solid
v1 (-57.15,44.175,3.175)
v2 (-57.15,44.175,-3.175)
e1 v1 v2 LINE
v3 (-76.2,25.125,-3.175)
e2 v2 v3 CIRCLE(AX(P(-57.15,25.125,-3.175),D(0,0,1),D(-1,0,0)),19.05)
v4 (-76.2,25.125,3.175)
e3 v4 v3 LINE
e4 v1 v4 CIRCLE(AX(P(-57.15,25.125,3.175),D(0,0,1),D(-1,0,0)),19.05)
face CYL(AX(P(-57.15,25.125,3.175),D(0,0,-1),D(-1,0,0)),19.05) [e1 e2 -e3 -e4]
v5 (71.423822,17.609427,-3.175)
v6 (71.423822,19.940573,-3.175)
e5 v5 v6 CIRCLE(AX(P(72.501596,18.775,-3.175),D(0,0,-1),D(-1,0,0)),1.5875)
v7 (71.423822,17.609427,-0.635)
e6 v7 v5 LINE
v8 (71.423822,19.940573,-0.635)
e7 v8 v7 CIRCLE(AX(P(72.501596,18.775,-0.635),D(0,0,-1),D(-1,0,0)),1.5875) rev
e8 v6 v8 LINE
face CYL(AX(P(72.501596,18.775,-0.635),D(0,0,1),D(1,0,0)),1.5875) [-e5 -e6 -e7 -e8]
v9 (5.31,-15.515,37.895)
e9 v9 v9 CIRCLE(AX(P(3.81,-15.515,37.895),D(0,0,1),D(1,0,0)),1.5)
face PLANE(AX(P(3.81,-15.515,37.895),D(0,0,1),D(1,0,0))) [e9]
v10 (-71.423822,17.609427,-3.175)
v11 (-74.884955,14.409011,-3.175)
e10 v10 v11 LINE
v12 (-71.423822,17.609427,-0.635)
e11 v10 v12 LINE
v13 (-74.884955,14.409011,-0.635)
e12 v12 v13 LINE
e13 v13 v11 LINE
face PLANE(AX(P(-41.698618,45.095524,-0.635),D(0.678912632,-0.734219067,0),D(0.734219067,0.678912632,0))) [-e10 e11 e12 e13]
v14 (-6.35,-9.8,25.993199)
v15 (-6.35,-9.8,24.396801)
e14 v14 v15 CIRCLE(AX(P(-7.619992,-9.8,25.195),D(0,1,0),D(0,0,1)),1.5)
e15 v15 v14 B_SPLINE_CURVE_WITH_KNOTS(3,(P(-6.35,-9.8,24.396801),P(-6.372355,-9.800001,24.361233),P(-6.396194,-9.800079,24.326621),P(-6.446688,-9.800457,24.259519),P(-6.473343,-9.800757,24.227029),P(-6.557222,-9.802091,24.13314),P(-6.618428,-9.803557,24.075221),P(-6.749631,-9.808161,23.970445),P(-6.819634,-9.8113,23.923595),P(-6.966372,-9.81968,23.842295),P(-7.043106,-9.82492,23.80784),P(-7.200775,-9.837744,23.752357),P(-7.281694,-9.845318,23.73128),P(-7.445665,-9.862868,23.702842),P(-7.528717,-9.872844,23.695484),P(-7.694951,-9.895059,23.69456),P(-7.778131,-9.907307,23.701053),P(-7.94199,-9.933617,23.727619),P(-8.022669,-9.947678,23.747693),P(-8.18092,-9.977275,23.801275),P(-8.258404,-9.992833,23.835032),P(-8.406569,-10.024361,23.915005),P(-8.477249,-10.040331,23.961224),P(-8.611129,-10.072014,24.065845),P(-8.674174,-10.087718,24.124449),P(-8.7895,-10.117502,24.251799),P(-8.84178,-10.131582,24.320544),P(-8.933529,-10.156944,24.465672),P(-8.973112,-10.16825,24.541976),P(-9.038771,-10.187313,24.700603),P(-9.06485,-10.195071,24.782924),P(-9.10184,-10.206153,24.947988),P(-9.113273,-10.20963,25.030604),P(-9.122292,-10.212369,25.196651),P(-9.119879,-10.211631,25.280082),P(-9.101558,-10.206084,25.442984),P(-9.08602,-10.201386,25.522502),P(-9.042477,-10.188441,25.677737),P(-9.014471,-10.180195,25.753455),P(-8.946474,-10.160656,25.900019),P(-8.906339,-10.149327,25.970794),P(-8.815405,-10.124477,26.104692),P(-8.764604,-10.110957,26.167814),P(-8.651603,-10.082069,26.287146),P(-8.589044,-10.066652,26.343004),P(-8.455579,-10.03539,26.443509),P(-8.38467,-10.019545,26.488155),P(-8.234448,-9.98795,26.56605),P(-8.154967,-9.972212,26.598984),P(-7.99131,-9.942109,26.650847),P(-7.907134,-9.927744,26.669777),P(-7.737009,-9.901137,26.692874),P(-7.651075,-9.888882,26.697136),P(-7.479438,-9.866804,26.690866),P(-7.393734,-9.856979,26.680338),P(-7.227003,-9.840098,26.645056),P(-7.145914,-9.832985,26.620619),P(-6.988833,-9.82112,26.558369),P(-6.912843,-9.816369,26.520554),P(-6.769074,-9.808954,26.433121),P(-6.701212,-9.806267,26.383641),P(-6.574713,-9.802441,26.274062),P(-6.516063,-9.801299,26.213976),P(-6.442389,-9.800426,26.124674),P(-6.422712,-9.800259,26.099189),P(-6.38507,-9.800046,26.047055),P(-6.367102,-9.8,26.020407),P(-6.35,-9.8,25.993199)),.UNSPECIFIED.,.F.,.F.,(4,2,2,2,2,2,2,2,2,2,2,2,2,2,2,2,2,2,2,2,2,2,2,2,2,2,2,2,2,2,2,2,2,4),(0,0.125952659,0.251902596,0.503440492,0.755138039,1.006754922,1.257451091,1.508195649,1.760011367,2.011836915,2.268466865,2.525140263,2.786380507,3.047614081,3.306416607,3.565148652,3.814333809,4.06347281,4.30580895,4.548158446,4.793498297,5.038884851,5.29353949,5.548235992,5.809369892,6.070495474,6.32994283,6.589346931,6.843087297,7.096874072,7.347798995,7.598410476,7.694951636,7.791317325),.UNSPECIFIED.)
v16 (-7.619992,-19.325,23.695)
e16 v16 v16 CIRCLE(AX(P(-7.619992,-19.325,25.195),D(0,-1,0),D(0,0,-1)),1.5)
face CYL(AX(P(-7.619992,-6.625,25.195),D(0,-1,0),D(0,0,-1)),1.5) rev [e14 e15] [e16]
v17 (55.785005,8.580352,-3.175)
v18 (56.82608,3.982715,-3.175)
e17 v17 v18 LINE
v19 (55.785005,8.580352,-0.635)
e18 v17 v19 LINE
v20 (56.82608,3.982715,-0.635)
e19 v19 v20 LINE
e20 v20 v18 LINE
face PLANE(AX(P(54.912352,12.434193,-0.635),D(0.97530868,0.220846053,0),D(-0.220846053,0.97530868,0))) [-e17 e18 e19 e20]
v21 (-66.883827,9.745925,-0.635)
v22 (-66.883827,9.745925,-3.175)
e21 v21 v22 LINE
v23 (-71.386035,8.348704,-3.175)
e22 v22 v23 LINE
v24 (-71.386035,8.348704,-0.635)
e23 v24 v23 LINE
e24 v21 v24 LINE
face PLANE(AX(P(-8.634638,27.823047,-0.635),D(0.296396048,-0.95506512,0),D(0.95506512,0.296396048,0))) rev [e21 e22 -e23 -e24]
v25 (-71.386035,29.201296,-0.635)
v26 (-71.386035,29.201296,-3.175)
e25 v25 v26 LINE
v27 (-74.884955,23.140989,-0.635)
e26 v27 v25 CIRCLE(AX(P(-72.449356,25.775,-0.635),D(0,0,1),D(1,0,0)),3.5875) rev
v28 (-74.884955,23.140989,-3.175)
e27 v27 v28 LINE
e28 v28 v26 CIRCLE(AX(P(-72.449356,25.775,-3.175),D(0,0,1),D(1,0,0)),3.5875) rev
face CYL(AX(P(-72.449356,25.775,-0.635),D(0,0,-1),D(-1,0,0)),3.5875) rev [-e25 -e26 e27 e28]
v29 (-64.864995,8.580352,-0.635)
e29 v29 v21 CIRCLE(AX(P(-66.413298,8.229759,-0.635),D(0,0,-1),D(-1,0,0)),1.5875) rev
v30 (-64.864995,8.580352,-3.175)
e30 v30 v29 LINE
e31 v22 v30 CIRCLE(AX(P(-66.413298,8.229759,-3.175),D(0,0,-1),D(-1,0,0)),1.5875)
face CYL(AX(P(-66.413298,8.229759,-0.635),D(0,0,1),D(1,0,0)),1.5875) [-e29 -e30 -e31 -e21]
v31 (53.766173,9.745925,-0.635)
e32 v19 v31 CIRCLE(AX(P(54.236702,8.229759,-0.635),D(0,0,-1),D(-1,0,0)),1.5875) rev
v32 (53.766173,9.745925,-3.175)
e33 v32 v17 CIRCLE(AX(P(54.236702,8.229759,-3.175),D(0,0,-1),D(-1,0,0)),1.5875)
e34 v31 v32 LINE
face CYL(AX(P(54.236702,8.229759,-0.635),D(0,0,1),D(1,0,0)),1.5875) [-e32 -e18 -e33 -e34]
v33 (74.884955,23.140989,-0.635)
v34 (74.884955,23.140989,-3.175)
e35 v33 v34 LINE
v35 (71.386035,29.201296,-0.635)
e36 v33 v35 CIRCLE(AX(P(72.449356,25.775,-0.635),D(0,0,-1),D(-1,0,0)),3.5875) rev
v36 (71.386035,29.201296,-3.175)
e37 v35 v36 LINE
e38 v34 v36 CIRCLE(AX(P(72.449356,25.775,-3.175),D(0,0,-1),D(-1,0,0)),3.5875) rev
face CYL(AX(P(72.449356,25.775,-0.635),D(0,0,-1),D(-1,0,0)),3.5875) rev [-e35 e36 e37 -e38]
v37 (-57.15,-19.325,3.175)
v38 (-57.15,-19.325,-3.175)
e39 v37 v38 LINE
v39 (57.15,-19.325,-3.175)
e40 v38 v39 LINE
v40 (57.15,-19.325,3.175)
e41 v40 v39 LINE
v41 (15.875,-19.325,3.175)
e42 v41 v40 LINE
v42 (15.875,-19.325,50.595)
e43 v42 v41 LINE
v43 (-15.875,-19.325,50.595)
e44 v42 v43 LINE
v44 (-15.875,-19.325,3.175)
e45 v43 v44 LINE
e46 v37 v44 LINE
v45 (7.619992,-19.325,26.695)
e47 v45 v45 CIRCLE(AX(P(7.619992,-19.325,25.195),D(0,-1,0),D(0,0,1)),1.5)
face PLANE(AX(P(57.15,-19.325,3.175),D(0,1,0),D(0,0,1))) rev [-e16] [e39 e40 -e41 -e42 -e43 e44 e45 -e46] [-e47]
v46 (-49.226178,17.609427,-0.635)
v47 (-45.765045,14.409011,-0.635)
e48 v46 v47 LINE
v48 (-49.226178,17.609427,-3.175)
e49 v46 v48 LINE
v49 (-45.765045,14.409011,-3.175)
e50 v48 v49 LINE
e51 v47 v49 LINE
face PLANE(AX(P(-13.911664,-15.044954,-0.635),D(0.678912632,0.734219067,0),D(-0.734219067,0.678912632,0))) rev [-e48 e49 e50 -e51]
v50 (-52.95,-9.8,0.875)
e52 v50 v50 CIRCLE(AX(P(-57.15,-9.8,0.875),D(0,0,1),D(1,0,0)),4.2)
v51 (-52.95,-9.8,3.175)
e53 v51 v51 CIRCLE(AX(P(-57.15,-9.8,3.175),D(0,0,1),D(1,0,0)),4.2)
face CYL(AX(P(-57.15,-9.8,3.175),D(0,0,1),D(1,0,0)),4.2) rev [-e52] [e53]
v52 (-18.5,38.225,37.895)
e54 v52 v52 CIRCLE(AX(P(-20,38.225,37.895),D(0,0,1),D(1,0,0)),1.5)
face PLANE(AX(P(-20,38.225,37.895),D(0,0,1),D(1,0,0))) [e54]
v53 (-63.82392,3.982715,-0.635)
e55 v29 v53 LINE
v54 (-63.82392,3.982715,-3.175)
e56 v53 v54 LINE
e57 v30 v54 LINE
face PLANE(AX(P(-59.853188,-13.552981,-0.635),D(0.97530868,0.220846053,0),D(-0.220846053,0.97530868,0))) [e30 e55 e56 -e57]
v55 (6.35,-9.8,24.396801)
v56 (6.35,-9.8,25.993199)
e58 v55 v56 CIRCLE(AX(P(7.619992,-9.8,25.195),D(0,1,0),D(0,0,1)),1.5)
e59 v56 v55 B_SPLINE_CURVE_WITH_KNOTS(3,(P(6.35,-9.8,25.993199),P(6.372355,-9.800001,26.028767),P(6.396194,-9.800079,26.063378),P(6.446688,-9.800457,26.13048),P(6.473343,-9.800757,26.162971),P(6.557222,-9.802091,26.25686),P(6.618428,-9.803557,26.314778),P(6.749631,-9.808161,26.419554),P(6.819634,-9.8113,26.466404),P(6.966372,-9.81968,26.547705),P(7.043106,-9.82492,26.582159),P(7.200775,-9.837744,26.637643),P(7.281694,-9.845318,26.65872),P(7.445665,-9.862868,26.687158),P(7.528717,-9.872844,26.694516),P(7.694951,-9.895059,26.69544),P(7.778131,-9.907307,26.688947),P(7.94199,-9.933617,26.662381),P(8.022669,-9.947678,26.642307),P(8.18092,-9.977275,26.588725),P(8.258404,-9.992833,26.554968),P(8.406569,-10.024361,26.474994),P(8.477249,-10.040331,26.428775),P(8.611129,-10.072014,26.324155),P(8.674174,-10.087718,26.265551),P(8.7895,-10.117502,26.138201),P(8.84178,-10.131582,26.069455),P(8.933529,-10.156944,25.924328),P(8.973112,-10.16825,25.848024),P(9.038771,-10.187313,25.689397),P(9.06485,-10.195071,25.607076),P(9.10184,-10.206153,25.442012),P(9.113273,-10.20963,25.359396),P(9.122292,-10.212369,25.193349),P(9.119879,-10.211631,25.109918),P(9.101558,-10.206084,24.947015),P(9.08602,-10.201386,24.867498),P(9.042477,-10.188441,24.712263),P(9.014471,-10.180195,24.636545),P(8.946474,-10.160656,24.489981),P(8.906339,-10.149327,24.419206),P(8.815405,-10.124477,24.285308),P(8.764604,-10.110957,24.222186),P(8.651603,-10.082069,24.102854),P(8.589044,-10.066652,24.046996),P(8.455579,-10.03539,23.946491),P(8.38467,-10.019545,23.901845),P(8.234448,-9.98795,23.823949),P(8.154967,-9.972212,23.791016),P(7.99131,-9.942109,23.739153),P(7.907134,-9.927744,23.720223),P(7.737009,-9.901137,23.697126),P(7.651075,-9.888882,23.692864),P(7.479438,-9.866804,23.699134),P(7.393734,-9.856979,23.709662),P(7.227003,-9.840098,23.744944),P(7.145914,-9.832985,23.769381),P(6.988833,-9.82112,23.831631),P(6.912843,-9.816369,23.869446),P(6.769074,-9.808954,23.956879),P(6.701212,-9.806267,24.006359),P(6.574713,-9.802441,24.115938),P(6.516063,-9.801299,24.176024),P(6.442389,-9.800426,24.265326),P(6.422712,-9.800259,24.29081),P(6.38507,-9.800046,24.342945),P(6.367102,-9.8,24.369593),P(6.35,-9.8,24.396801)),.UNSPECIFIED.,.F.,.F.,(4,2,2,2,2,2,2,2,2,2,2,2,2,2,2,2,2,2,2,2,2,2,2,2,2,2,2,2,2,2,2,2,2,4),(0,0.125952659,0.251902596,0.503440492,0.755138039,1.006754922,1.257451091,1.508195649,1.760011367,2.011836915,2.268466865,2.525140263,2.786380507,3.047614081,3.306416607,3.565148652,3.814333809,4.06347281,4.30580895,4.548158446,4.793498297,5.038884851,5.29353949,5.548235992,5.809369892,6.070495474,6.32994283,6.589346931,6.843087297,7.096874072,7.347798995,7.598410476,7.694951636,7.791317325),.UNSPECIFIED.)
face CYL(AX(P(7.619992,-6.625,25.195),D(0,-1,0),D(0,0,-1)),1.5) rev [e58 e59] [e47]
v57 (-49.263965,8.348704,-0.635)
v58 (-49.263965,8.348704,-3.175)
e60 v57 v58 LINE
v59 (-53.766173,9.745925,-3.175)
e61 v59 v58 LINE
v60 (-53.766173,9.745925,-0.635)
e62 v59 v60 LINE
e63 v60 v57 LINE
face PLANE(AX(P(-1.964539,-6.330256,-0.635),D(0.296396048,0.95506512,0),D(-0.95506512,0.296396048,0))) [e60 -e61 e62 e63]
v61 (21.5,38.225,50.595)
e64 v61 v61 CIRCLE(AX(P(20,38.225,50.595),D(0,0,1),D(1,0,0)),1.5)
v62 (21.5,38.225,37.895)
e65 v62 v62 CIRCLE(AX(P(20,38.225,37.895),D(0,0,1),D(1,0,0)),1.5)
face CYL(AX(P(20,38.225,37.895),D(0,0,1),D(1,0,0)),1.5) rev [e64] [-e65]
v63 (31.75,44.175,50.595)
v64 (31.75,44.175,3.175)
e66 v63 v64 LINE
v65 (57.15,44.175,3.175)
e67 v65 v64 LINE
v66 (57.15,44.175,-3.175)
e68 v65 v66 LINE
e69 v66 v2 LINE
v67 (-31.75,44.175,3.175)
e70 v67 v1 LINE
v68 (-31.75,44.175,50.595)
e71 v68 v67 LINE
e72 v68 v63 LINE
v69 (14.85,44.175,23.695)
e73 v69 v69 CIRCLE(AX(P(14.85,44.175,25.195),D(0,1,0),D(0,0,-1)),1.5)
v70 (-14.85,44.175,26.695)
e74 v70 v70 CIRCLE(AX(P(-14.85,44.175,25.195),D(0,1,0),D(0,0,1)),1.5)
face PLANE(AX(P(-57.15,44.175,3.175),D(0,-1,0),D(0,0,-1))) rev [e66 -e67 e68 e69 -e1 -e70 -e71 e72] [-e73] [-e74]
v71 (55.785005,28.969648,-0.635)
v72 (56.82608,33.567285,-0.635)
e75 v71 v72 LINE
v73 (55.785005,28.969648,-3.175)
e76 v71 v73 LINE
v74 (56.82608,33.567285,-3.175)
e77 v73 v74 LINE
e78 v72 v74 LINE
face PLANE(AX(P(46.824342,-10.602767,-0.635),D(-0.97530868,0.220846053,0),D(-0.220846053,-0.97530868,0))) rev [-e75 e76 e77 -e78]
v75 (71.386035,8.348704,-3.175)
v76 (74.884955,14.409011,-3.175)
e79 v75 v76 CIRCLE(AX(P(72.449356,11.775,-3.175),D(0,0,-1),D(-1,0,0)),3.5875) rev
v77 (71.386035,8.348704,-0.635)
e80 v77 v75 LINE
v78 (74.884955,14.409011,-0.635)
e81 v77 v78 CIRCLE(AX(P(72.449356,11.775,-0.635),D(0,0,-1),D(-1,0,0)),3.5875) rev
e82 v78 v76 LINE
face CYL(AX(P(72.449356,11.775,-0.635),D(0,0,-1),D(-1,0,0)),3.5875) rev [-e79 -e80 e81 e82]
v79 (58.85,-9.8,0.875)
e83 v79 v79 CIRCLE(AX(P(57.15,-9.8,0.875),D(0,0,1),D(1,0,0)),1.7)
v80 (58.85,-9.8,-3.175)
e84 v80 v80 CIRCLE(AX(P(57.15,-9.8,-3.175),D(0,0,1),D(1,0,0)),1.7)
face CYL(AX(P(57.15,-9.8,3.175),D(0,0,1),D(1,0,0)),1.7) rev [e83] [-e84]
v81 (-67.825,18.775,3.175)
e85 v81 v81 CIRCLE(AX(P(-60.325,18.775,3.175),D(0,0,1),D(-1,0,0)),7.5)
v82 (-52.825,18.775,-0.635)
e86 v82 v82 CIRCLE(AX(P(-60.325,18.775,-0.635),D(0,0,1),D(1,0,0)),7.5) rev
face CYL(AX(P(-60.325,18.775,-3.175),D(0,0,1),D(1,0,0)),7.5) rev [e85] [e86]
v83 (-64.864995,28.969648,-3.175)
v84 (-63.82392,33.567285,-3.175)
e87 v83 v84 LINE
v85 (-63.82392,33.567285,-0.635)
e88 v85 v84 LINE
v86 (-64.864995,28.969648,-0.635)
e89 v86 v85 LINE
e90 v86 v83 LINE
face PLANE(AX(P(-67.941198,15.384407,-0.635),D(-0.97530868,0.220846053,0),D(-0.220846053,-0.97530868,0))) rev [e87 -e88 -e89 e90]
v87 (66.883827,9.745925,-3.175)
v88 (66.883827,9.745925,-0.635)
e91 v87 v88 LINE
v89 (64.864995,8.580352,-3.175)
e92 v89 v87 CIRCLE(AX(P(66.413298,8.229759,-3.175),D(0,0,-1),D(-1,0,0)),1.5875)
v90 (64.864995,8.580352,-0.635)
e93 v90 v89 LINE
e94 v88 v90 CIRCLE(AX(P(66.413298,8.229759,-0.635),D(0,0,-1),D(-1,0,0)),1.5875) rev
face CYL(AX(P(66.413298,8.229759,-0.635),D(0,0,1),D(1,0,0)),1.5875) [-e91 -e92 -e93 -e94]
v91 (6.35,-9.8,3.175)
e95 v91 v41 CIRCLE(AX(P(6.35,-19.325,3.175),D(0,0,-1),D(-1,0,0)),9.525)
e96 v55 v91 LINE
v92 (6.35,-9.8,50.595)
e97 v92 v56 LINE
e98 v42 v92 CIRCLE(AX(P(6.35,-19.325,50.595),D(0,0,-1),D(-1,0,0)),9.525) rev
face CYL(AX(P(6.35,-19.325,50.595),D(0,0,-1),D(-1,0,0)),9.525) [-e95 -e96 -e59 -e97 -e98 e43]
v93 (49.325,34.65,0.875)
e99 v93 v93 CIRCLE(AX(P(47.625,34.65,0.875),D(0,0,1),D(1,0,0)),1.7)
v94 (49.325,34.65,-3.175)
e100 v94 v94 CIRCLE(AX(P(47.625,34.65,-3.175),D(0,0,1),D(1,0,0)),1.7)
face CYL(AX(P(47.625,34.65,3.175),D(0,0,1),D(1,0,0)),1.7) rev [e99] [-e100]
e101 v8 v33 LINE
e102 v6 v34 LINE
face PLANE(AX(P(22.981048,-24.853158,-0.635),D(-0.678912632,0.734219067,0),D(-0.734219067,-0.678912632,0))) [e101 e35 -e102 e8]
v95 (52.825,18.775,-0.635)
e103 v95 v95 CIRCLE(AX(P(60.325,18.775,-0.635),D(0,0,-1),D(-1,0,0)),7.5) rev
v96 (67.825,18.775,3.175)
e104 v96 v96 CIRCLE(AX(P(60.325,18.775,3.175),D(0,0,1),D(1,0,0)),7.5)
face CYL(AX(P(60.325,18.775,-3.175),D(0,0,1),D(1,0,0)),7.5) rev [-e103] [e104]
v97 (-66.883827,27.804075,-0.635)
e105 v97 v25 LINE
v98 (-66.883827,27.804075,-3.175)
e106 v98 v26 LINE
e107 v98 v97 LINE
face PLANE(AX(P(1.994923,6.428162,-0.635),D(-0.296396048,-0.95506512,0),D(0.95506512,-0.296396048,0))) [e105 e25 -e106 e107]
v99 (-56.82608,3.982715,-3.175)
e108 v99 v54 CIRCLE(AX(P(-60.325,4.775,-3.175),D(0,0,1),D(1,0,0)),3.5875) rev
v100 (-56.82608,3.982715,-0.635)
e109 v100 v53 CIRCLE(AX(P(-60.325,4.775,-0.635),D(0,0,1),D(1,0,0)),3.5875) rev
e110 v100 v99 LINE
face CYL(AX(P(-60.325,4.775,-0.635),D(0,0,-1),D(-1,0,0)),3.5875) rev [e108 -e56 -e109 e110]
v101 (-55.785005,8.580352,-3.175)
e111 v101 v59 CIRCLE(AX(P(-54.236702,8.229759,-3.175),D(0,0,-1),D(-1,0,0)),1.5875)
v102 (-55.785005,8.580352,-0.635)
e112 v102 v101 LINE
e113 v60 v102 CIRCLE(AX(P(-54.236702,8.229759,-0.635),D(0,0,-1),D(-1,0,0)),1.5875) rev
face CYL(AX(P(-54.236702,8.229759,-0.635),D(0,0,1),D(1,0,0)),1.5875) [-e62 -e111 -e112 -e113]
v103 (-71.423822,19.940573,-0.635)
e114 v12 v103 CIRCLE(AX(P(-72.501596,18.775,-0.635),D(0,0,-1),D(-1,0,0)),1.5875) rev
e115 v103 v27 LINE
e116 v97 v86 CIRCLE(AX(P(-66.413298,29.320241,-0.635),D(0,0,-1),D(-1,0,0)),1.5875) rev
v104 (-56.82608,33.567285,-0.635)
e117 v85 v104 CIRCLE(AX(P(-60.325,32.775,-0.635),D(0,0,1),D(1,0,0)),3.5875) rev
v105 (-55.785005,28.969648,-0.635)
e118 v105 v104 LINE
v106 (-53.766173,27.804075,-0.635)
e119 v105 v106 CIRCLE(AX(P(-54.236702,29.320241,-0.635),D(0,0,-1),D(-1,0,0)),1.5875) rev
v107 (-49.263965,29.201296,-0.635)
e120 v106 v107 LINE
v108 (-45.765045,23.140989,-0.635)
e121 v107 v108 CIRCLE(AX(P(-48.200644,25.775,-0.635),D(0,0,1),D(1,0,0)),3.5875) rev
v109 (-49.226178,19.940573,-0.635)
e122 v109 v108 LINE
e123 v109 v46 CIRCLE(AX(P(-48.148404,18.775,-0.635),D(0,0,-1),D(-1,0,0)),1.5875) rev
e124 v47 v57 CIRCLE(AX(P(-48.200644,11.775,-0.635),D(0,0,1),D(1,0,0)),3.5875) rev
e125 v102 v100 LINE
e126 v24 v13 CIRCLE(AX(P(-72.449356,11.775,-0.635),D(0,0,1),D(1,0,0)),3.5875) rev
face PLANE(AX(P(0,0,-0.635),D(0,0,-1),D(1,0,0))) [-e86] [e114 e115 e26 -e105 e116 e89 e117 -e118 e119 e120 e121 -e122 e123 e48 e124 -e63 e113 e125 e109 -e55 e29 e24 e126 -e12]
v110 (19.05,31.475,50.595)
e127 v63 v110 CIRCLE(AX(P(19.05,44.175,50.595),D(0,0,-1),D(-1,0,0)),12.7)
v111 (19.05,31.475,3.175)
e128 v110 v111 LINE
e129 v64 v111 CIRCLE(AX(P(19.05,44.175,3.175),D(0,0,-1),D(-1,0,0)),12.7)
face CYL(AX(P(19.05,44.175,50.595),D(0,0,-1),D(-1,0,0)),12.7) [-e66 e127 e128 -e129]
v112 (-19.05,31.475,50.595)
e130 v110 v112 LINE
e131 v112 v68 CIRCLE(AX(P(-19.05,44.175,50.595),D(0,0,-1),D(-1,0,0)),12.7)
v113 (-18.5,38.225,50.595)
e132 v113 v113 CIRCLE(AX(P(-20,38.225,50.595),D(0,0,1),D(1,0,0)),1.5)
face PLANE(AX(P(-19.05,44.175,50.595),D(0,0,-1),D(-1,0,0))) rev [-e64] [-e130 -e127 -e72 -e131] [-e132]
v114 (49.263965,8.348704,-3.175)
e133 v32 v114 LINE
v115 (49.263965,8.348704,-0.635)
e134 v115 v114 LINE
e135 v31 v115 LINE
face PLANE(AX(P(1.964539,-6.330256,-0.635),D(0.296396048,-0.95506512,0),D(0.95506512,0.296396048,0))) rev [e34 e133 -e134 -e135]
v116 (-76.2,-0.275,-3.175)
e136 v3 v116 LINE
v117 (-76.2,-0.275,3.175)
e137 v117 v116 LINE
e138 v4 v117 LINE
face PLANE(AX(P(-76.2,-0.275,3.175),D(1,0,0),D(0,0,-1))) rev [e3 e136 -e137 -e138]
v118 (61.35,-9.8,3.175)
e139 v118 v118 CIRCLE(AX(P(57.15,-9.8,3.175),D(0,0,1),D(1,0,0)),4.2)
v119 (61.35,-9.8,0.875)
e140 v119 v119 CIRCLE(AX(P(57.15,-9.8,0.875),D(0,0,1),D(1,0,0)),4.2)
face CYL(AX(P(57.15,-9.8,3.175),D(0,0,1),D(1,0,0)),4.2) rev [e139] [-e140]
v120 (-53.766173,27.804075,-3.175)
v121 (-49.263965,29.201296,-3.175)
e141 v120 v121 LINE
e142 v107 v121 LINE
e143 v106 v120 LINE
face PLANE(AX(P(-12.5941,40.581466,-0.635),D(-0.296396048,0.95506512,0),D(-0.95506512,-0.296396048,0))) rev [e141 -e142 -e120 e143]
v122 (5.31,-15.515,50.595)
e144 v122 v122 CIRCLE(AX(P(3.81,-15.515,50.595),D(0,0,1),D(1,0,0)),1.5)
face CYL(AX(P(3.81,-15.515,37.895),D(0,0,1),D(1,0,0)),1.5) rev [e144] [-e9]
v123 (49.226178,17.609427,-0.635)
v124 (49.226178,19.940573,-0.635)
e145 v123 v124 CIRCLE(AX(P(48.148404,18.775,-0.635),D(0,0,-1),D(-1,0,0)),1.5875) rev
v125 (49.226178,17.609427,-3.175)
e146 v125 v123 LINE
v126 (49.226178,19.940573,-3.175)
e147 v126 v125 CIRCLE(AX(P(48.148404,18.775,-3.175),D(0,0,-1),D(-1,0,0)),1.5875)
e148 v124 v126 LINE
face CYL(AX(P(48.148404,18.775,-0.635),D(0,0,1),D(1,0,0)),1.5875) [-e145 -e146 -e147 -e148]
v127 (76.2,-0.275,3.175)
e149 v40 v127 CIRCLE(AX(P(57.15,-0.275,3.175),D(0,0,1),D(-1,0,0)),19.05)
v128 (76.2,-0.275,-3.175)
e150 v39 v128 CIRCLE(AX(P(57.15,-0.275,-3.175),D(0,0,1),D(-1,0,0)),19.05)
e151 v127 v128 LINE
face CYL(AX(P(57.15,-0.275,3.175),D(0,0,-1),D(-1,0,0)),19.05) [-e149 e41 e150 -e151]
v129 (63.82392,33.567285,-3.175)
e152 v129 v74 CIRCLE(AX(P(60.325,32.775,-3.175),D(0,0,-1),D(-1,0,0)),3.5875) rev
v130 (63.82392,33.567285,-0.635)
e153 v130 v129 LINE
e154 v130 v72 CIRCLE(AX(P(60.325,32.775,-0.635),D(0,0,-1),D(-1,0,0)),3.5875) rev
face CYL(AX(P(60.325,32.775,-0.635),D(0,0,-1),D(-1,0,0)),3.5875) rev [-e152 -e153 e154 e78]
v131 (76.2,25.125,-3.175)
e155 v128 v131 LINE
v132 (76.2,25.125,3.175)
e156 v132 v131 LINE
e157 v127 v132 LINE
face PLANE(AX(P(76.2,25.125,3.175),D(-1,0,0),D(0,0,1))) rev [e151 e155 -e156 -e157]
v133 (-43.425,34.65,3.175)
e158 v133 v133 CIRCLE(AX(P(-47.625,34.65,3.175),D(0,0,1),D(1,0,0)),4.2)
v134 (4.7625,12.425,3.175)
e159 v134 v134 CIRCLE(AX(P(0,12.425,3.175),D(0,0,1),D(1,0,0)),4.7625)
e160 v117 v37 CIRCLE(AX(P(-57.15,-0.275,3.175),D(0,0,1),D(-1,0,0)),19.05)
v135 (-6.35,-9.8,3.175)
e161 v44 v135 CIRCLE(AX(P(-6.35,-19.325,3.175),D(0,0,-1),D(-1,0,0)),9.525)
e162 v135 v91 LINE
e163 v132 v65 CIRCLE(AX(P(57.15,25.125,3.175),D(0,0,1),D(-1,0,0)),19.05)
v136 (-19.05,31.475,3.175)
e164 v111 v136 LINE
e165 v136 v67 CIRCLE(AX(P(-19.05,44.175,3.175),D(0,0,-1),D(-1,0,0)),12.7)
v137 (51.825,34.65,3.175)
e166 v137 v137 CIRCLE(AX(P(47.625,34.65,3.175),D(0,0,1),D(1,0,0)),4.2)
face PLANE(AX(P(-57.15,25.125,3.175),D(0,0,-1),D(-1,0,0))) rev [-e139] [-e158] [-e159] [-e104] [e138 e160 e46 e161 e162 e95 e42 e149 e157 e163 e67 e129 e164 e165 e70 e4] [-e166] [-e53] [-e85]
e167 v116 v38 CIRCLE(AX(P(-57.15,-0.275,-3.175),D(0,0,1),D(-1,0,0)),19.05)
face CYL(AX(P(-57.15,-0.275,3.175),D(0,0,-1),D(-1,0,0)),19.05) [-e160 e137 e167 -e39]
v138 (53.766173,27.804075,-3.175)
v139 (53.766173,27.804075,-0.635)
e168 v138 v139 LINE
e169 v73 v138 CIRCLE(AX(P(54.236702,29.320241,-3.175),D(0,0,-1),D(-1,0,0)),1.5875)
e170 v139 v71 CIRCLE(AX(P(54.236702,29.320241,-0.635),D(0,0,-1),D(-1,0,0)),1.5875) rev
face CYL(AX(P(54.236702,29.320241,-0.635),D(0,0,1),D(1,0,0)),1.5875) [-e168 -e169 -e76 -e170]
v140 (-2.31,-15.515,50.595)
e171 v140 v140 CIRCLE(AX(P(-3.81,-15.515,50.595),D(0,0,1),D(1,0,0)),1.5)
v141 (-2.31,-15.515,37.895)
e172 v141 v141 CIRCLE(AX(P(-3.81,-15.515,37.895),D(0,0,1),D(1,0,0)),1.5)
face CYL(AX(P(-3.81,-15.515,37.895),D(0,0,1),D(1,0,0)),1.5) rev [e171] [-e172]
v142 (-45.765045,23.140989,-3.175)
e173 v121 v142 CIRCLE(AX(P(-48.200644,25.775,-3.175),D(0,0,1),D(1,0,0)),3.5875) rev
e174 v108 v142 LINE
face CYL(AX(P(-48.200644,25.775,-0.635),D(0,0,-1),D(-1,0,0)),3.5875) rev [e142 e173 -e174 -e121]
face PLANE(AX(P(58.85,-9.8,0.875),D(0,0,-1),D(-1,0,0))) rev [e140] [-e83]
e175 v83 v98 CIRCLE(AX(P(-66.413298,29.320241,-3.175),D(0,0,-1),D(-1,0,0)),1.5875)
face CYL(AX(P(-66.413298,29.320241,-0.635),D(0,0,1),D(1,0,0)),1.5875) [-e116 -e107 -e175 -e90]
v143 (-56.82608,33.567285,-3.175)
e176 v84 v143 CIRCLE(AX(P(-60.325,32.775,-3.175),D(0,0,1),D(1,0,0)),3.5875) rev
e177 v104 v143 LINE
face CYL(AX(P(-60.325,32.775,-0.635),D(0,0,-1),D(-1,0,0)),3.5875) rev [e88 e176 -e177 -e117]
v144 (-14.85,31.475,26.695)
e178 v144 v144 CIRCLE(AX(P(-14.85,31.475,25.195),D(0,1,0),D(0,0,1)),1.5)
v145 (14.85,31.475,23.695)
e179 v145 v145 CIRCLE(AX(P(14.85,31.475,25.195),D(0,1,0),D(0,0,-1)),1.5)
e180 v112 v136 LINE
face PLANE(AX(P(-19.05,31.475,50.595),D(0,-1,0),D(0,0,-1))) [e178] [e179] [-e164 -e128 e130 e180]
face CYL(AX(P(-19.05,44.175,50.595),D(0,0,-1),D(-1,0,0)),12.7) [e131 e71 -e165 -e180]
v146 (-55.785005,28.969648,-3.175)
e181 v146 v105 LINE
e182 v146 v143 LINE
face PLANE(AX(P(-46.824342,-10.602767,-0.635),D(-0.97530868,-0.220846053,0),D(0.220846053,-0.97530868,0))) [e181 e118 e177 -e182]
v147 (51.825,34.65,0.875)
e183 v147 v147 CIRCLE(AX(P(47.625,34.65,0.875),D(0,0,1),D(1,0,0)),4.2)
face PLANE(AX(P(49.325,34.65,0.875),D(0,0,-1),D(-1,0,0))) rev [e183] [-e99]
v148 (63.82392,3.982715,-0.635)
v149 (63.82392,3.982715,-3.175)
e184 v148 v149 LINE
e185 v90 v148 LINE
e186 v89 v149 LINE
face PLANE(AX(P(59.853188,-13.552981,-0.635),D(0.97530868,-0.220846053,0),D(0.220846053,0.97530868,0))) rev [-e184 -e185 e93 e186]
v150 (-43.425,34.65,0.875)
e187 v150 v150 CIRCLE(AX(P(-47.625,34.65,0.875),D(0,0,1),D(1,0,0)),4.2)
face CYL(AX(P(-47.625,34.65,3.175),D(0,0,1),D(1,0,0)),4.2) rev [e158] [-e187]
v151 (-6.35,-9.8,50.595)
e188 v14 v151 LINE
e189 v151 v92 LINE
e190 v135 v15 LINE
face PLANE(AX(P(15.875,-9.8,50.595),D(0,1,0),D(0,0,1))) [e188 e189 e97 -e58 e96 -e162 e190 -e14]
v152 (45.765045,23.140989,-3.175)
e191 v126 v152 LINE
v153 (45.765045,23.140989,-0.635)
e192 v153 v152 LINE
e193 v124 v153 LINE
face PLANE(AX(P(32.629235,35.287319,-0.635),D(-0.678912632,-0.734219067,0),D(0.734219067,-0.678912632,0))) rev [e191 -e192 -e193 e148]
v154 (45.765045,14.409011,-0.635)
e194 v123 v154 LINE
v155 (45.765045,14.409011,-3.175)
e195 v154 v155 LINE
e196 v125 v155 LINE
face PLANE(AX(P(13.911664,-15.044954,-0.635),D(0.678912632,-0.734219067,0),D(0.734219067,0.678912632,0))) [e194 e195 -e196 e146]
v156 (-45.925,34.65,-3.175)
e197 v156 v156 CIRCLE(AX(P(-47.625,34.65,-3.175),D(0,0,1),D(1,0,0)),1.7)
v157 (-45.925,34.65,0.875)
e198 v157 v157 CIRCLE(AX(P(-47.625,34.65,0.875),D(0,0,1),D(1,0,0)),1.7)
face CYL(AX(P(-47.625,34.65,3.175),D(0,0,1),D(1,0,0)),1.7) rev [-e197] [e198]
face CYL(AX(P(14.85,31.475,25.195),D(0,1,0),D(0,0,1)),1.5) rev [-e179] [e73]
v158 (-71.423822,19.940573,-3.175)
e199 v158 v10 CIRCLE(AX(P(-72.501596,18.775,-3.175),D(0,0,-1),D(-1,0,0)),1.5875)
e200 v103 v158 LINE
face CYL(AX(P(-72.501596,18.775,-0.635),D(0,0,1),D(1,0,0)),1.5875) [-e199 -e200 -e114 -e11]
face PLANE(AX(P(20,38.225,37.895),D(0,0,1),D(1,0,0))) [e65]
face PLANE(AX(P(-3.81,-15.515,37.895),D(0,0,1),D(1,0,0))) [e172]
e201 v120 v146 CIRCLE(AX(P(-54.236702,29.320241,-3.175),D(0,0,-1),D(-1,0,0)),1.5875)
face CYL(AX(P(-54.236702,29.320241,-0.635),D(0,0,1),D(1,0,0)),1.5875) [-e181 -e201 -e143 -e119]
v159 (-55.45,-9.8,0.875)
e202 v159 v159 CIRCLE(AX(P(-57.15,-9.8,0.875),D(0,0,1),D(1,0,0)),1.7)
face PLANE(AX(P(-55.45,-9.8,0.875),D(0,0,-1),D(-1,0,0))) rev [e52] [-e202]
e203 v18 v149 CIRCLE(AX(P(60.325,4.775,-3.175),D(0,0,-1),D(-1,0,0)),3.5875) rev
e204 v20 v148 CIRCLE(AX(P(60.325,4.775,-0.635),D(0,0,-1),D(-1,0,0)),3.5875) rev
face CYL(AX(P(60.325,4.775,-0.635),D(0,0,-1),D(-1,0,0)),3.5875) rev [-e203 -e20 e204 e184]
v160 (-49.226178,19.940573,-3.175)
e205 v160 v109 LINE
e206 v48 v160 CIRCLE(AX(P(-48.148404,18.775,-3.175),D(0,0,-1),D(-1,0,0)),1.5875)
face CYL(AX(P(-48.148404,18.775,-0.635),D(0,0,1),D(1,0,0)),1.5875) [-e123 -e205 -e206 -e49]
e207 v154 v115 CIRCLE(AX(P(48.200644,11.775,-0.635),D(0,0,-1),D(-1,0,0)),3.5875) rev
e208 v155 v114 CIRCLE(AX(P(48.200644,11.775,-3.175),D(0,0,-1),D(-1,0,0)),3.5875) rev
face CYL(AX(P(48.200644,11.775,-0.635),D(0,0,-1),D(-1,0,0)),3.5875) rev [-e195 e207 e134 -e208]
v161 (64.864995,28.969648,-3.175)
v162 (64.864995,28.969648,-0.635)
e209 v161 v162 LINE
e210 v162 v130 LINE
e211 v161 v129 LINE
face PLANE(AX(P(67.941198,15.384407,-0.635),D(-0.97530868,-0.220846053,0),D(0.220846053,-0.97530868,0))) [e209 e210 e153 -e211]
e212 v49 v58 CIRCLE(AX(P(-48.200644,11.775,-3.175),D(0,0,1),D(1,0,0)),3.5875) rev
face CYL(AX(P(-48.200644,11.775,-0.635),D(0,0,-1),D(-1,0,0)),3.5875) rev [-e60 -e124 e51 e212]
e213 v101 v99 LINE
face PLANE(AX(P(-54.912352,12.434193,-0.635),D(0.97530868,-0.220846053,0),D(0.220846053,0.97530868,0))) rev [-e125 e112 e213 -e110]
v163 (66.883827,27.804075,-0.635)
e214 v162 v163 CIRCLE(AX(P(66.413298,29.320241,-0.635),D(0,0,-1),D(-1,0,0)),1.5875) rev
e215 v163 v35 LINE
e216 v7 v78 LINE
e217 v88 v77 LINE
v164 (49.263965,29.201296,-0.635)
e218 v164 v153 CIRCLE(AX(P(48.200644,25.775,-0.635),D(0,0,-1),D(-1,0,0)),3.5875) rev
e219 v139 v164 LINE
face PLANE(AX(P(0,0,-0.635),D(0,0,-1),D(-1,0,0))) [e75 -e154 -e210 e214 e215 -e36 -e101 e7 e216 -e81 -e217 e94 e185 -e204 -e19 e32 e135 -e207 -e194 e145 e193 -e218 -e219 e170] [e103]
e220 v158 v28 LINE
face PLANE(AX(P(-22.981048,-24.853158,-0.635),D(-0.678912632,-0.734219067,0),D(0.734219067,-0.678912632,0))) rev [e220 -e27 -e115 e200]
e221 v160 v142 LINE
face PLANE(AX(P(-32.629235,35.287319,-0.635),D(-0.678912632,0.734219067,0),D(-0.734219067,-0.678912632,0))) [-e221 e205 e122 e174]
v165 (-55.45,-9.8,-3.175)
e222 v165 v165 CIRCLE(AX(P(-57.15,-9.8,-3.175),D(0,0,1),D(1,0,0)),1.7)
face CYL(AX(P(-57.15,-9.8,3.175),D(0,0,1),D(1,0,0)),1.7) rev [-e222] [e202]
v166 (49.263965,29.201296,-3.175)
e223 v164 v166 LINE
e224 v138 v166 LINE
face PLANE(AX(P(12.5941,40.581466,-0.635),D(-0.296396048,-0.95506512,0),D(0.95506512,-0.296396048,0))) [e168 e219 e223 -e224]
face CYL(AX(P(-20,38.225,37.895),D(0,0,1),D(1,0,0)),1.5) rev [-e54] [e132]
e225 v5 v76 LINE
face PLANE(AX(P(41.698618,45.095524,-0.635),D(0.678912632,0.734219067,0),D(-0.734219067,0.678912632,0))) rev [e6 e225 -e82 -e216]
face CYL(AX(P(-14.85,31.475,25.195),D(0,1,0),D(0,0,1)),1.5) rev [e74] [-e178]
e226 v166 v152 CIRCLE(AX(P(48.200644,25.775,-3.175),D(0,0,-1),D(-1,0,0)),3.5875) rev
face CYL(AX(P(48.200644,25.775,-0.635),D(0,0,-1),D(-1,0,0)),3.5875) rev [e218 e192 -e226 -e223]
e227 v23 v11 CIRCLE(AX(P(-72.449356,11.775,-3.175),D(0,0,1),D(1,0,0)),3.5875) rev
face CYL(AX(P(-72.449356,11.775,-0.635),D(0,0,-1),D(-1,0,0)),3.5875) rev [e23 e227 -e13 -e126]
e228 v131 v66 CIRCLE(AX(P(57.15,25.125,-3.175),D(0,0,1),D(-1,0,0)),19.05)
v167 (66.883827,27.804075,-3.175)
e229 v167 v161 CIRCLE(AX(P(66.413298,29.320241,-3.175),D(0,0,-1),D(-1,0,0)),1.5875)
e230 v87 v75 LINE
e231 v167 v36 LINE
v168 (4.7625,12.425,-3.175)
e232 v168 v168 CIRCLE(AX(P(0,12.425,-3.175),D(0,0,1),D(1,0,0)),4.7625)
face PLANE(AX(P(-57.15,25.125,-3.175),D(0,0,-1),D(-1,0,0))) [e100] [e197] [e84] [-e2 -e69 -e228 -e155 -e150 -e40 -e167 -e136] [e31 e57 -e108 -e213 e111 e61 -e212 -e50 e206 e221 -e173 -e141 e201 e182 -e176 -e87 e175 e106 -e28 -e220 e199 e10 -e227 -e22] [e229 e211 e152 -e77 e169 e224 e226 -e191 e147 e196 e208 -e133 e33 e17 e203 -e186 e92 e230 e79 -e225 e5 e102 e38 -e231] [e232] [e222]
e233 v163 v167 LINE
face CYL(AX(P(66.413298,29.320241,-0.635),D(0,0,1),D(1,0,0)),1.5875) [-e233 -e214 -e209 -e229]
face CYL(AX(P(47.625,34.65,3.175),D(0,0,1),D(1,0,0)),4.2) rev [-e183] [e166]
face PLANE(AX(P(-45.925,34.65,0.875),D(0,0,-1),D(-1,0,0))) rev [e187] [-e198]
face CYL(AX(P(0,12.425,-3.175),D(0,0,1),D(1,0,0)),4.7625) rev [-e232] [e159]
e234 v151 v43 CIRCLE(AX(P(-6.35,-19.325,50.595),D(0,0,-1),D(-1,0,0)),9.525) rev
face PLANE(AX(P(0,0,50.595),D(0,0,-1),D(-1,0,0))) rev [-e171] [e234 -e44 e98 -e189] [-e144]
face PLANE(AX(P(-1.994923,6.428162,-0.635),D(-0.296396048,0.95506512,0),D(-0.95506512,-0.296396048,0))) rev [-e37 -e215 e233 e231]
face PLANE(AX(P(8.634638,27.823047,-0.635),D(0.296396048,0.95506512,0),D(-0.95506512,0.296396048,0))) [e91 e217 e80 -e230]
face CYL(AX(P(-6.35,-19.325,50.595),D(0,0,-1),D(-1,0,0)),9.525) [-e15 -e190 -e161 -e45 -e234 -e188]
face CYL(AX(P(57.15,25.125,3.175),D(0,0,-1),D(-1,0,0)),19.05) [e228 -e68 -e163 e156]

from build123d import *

# Parameters (mm, degrees)
BOSS_EXTRUDE1_DEPTH                              = 3.175
SKETCH2_W                                        = 31.75
SKETCH2_H                                        = 9.525
BOSS_EXTRUDE2_DEPTH                              = 47.419999902
SKETCH3_R                                        = 1.5
CUT_EXTRUDE1_DEPTH                               = 12.7
SKETCH6_R                                        = 1.5
CUT_EXTRUDE2_DEPTH                               = 12.7
SKETCH7_R                                        = 1.5
CUT_EXTRUDE3_DEPTH                               = 12.7
FILLET1_R                                        = 9.525
SKETCH12_R                                       = 7.5
CUT_EXTRUDE4_DEPTH                               = 101.032629802
CUT_EXTRUDE5_START                               = -2.54
CUT_EXTRUDE5_DEPTH                               = 2.54
FILLET3_R                                        = 1.5875
FILLET3_OF_MIRROR2_R                             = 1.5875
CBORE_FOR_M3_HEX_HEAD_MACHINE_SCREW1_D           = 3.4
CBORE_FOR_M3_HEX_HEAD_MACHINE_SCREW1_CBORE_D     = 8.4
CBORE_FOR_M3_HEX_HEAD_MACHINE_SCREW1_CBORE_DEPTH = 2.3
SKETCH19_R                                       = 4.7625
CUT_EXTRUDE6_DEPTH                               = 101.032629802


with BuildPart() as part:
    # Sketch1 → Boss-Extrude1 (new, symmetric)
    with BuildSketch(Plane.XY):
        with BuildLine():
            Line((-57.15, 44.175), (57.15, 44.175))
            ThreePointArc((57.15, 44.175), (70.620384182, 38.595384182), (76.2, 25.125))
            Line((76.2, 25.125), (76.2, -0.275))
            ThreePointArc((76.2, -0.275), (70.620384182, -13.745384182), (57.15, -19.325))
            Line((57.15, -19.325), (-57.15, -19.325))
            ThreePointArc((-57.15, -19.325), (-70.620384182, -13.745384182), (-76.2, -0.275))
            Line((-76.2, -0.275), (-76.2, 25.125))
            ThreePointArc((-76.2, 25.125), (-70.620384182, 38.595384182), (-57.15, 44.175))
        make_face()
    extrude(amount=BOSS_EXTRUDE1_DEPTH, both=True)

    # Sketch2 → Boss-Extrude2 (add)
    with BuildSketch(Plane(origin=(0, 0, 3.175), x_dir=(-1, 0, 0), z_dir=(0, 0, -1))):
        with BuildLine():
            Line((-31.75, 44.175), (31.75, 44.175))
            ThreePointArc((31.75, 44.175), (28.030256121, 35.194743879), (19.05, 31.475))
            Line((19.05, 31.475), (-19.05, 31.475))
            ThreePointArc((-19.05, 31.475), (-28.030256121, 35.194743879), (-31.75, 44.175))
        make_face()
        with Locations((0, -14.5625)):
            Rectangle(SKETCH2_W, SKETCH2_H)
    extrude(amount=-BOSS_EXTRUDE2_DEPTH)

    # Sketch3 → Cut-Extrude1 (cut)
    with BuildSketch(Plane.XY.offset(50.594999902)):
        with Locations((-20, 38.225)):
            Circle(SKETCH3_R)
        with Locations((20, 38.225)):
            Circle(SKETCH3_R)
        with Locations((-3.81, -15.515)):
            Circle(SKETCH3_R)
        with Locations((3.81, -15.515)):
            Circle(SKETCH3_R)
    extrude(amount=-CUT_EXTRUDE1_DEPTH, mode=Mode.SUBTRACT)

    # Sketch6 → Cut-Extrude2 (cut)
    with BuildSketch(Plane(origin=(0, 44.175, 0), x_dir=(1, 0, 0), z_dir=(0, 1, 0))):
        with Locations(Location((-14.85, -25.194999902, 0), (0, 0, 270))):
            Circle(SKETCH6_R)
        with Locations(Location((14.85, -25.194999902, 0), (0, 0, 90))):
            Circle(SKETCH6_R)
    extrude(amount=-CUT_EXTRUDE2_DEPTH, mode=Mode.SUBTRACT)

    # Sketch7 → Cut-Extrude3 (cut)
    with BuildSketch(Plane.XZ.offset(19.325)):
        with Locations(Location((-7.6199916, 25.194999902, 0), (0, 0, 270))):
            Circle(SKETCH7_R)
        with Locations(Location((7.6199916, 25.194999902, 0), (0, 0, 212.149655394))):
            Circle(SKETCH7_R)
    extrude(amount=-CUT_EXTRUDE3_DEPTH, mode=Mode.SUBTRACT)

    # Fillet1
    # the kernel refuses this fillet: 9.525 mm, written as the material it takes off along each edge
    with BuildSketch(Plane(origin=(-15.875, -9.8, 3.175), x_dir=(0, -1, 0), z_dir=(0, 0, 1)), Plane(origin=(15.875, -9.8, 3.175), x_dir=(-1, 0, 0), z_dir=(0, 0, 1))) as fillet1_piece_1:
        with BuildLine():
            CenterArc((FILLET1_R, FILLET1_R), FILLET1_R, 180, 90)
            Line((0, FILLET1_R), (-FILLET1_R * 0.02, FILLET1_R))
            Line((-FILLET1_R * 0.02, FILLET1_R), (-FILLET1_R * 0.02, -FILLET1_R * 0.02))
            Line((-FILLET1_R * 0.02, -FILLET1_R * 0.02), (FILLET1_R, -FILLET1_R * 0.02))
            Line((FILLET1_R, -FILLET1_R * 0.02), (FILLET1_R, 0))
        make_face()
    extrude(amount=47.419999902, mode=Mode.SUBTRACT)

    # Sketch12 → Cut-Extrude4 (cut, through all)
    with BuildSketch(Plane.XY.offset(3.175)):
        with Locations((60.325, 18.775)):
            Circle(SKETCH12_R)
        with Locations((-60.325, 18.775)):
            Circle(SKETCH12_R)
    extrude(amount=-CUT_EXTRUDE4_DEPTH, mode=Mode.SUBTRACT)

    # Sketch14 → Cut-Extrude5 (cut)
    with BuildSketch(Plane(origin=(0, 0, -3.175), x_dir=(-1, 0, 0), z_dir=(0, 0, -1)).offset(CUT_EXTRUDE5_START)):
        with BuildLine():
            ThreePointArc((-67.36426696, 21.363188685), (-66.820190528, 22.525), (-66.086070631, 23.577089669))
            Line((-66.086070631, 23.577089669), (-65.244148963, 27.295215935))
            Line((-65.244148963, 27.295215935), (-71.386034831, 29.201296117))
            ThreePointArc((-71.386034831, 29.201296117), (-75.556221789, 27.56875), (-74.88495472, 23.140989098))
            Line((-74.88495472, 23.140989098), (-70.163297927, 18.775))
            Line((-70.163297927, 18.775), (-67.36426696, 21.363188685))
        make_face()
        with BuildLine():
            Line((-65.244148963, 27.295215935), (-66.086070631, 23.577089669))
            ThreePointArc((-66.086070631, 23.577089669), (-64.075, 25.270190528), (-61.603196329, 26.165278354))
            Line((-61.603196329, 26.165278354), (-65.244148963, 27.295215935))
        make_face()
        with BuildLine():
            Line((-63.823919889, 33.567285215), (-65.244148963, 27.295215935))
            Line((-65.244148963, 27.295215935), (-61.603196329, 26.165278354))
            ThreePointArc((-61.603196329, 26.165278354), (-60.325, 26.275), (-59.046803671, 26.165278354))
            Line((-59.046803671, 26.165278354), (-55.405851037, 27.295215935))
            Line((-55.405851037, 27.295215935), (-56.826080111, 33.567285215))
            ThreePointArc((-56.826080111, 33.567285215), (-60.325, 36.3625), (-63.823919889, 33.567285215))
        make_face()
        with BuildLine():
            Line((-55.405851037, 27.295215935), (-59.046803671, 26.165278354))
            ThreePointArc((-59.046803671, 26.165278354), (-56.575, 25.270190528), (-54.563929369, 23.577089669))
            Line((-54.563929369, 23.577089669), (-55.405851037, 27.295215935))
        make_face()
        with BuildLine():
            Line((-49.263965169, 29.201296117), (-55.405851037, 27.295215935))
            Line((-55.405851037, 27.295215935), (-54.563929369, 23.577089669))
            ThreePointArc((-54.563929369, 23.577089669), (-53.829809472, 22.525), (-53.28573304, 21.363188685))
            Line((-53.28573304, 21.363188685), (-50.486702073, 18.775))
            Line((-50.486702073, 18.775), (-45.76504528, 23.140989098))
            ThreePointArc((-45.76504528, 23.140989098), (-45.093778211, 27.56875), (-49.263965169, 29.201296117))
        make_face()
        with BuildLine():
            Line((-50.486702073, 18.775), (-53.28573304, 21.363188685))
            ThreePointArc((-53.28573304, 21.363188685), (-52.941081589, 20.089438626), (-52.825, 18.775))
            ThreePointArc((-52.825, 18.775), (-52.941081589, 17.460561374), (-53.28573304, 16.186811315))
            Line((-53.28573304, 16.186811315), (-50.486702073, 18.775))
        make_face()
        with BuildLine():
            Line((-45.76504528, 14.409010902), (-50.486702073, 18.775))
            Line((-50.486702073, 18.775), (-53.28573304, 16.186811315))
            ThreePointArc((-53.28573304, 16.186811315), (-53.829809472, 15.025), (-54.563929369, 13.972910331))
            Line((-54.563929369, 13.972910331), (-55.405851037, 10.254784065))
            Line((-55.405851037, 10.254784065), (-49.263965169, 8.348703883))
            ThreePointArc((-49.263965169, 8.348703883), (-45.093778211, 9.98125), (-45.76504528, 14.409010902))
        make_face()
        with BuildLine():
            ThreePointArc((-54.563929369, 13.972910331), (-56.575, 12.279809472), (-59.046803671, 11.384721646))
            Line((-59.046803671, 11.384721646), (-55.405851037, 10.254784065))
            Line((-55.405851037, 10.254784065), (-54.563929369, 13.972910331))
        make_face()
        with BuildLine():
            Line((-61.603196329, 11.384721646), (-65.244148963, 10.254784065))
            Line((-65.244148963, 10.254784065), (-63.823919889, 3.982714785))
            ThreePointArc((-63.823919889, 3.982714785), (-60.325, 1.1875), (-56.826080111, 3.982714785))
            Line((-56.826080111, 3.982714785), (-55.405851037, 10.254784065))
            Line((-55.405851037, 10.254784065), (-59.046803671, 11.384721646))
            ThreePointArc((-59.046803671, 11.384721646), (-60.325, 11.275), (-61.603196329, 11.384721646))
        make_face()
        with BuildLine():
            ThreePointArc((-61.603196329, 11.384721646), (-64.075, 12.279809472), (-66.086070631, 13.972910331))
            Line((-66.086070631, 13.972910331), (-65.244148963, 10.254784065))
            Line((-65.244148963, 10.254784065), (-61.603196329, 11.384721646))
        make_face()
        with BuildLine():
            Line((-67.36426696, 16.186811315), (-70.163297927, 18.775))
            Line((-70.163297927, 18.775), (-74.88495472, 14.409010902))
            ThreePointArc((-74.88495472, 14.409010902), (-75.556221789, 9.98125), (-71.386034831, 8.348703883))
            Line((-71.386034831, 8.348703883), (-65.244148963, 10.254784065))
            Line((-65.244148963, 10.254784065), (-66.086070631, 13.972910331))
            ThreePointArc((-66.086070631, 13.972910331), (-66.820190528, 15.025), (-67.36426696, 16.186811315))
        make_face()
        with BuildLine():
            ThreePointArc((-67.36426696, 16.186811315), (-67.825, 18.775), (-67.36426696, 21.363188685))
            Line((-67.36426696, 21.363188685), (-70.163297927, 18.775))
            Line((-70.163297927, 18.775), (-67.36426696, 16.186811315))
        make_face()
    cut_extrude5 = extrude(amount=CUT_EXTRUDE5_DEPTH, mode=Mode.SUBTRACT)

    # Fillet3
    fillet3_edges = [part.edges().sort_by_distance(p)[0] for p in [
        (65.244148963, 27.295215935, -1.905),
        (55.405851037, 27.295215935, -1.905),
        (50.486702073, 18.775, -1.905),
        (55.405851037, 10.254784065, -1.905),
        (65.244148963, 10.254784065, -1.905),
        (70.163297927, 18.775, -1.905),
    ]]
    fillet(fillet3_edges, radius=FILLET3_R)

    # Mirror2: Cut-Extrude5 across plane
    add(cut_extrude5.mirror(Plane(origin=(0, 0, 0), x_dir=(0, 0, 1), z_dir=(1, 0, 0))), mode=Mode.SUBTRACT)

    # Fillet3 of Mirror2
    fillet3_of_mirror2_edges = [part.edges().sort_by_distance(p)[0] for p in [
        (-65.244148963, 27.295215935, -1.905),
        (-55.405851037, 27.295215935, -1.905),
        (-50.486702073, 18.775, -1.905),
        (-55.405851037, 10.254784065, -1.905),
        (-65.244148963, 10.254784065, -1.905),
        (-70.163297927, 18.775, -1.905),
    ]]
    fillet(fillet3_of_mirror2_edges, radius=FILLET3_OF_MIRROR2_R)

    # CBORE for M3 Hex Head Machine Screw1 (through all)
    with Locations(Plane.XY.offset(3.175)):
        with Locations((-47.625, 34.65), (-57.15, -9.8), (57.15, -9.8), (47.625, 34.65)):
            CounterBoreHole(CBORE_FOR_M3_HEX_HEAD_MACHINE_SCREW1_D / 2, CBORE_FOR_M3_HEX_HEAD_MACHINE_SCREW1_CBORE_D / 2, CBORE_FOR_M3_HEX_HEAD_MACHINE_SCREW1_CBORE_DEPTH)

    # Sketch19 → Cut-Extrude6 (cut, through all)
    with BuildSketch(Plane.XY.offset(3.175)):
        with Locations((0, 12.425)):
            Circle(SKETCH19_R)
    extrude(amount=-CUT_EXTRUDE6_DEPTH, mode=Mode.SUBTRACT)


solid = part.part
